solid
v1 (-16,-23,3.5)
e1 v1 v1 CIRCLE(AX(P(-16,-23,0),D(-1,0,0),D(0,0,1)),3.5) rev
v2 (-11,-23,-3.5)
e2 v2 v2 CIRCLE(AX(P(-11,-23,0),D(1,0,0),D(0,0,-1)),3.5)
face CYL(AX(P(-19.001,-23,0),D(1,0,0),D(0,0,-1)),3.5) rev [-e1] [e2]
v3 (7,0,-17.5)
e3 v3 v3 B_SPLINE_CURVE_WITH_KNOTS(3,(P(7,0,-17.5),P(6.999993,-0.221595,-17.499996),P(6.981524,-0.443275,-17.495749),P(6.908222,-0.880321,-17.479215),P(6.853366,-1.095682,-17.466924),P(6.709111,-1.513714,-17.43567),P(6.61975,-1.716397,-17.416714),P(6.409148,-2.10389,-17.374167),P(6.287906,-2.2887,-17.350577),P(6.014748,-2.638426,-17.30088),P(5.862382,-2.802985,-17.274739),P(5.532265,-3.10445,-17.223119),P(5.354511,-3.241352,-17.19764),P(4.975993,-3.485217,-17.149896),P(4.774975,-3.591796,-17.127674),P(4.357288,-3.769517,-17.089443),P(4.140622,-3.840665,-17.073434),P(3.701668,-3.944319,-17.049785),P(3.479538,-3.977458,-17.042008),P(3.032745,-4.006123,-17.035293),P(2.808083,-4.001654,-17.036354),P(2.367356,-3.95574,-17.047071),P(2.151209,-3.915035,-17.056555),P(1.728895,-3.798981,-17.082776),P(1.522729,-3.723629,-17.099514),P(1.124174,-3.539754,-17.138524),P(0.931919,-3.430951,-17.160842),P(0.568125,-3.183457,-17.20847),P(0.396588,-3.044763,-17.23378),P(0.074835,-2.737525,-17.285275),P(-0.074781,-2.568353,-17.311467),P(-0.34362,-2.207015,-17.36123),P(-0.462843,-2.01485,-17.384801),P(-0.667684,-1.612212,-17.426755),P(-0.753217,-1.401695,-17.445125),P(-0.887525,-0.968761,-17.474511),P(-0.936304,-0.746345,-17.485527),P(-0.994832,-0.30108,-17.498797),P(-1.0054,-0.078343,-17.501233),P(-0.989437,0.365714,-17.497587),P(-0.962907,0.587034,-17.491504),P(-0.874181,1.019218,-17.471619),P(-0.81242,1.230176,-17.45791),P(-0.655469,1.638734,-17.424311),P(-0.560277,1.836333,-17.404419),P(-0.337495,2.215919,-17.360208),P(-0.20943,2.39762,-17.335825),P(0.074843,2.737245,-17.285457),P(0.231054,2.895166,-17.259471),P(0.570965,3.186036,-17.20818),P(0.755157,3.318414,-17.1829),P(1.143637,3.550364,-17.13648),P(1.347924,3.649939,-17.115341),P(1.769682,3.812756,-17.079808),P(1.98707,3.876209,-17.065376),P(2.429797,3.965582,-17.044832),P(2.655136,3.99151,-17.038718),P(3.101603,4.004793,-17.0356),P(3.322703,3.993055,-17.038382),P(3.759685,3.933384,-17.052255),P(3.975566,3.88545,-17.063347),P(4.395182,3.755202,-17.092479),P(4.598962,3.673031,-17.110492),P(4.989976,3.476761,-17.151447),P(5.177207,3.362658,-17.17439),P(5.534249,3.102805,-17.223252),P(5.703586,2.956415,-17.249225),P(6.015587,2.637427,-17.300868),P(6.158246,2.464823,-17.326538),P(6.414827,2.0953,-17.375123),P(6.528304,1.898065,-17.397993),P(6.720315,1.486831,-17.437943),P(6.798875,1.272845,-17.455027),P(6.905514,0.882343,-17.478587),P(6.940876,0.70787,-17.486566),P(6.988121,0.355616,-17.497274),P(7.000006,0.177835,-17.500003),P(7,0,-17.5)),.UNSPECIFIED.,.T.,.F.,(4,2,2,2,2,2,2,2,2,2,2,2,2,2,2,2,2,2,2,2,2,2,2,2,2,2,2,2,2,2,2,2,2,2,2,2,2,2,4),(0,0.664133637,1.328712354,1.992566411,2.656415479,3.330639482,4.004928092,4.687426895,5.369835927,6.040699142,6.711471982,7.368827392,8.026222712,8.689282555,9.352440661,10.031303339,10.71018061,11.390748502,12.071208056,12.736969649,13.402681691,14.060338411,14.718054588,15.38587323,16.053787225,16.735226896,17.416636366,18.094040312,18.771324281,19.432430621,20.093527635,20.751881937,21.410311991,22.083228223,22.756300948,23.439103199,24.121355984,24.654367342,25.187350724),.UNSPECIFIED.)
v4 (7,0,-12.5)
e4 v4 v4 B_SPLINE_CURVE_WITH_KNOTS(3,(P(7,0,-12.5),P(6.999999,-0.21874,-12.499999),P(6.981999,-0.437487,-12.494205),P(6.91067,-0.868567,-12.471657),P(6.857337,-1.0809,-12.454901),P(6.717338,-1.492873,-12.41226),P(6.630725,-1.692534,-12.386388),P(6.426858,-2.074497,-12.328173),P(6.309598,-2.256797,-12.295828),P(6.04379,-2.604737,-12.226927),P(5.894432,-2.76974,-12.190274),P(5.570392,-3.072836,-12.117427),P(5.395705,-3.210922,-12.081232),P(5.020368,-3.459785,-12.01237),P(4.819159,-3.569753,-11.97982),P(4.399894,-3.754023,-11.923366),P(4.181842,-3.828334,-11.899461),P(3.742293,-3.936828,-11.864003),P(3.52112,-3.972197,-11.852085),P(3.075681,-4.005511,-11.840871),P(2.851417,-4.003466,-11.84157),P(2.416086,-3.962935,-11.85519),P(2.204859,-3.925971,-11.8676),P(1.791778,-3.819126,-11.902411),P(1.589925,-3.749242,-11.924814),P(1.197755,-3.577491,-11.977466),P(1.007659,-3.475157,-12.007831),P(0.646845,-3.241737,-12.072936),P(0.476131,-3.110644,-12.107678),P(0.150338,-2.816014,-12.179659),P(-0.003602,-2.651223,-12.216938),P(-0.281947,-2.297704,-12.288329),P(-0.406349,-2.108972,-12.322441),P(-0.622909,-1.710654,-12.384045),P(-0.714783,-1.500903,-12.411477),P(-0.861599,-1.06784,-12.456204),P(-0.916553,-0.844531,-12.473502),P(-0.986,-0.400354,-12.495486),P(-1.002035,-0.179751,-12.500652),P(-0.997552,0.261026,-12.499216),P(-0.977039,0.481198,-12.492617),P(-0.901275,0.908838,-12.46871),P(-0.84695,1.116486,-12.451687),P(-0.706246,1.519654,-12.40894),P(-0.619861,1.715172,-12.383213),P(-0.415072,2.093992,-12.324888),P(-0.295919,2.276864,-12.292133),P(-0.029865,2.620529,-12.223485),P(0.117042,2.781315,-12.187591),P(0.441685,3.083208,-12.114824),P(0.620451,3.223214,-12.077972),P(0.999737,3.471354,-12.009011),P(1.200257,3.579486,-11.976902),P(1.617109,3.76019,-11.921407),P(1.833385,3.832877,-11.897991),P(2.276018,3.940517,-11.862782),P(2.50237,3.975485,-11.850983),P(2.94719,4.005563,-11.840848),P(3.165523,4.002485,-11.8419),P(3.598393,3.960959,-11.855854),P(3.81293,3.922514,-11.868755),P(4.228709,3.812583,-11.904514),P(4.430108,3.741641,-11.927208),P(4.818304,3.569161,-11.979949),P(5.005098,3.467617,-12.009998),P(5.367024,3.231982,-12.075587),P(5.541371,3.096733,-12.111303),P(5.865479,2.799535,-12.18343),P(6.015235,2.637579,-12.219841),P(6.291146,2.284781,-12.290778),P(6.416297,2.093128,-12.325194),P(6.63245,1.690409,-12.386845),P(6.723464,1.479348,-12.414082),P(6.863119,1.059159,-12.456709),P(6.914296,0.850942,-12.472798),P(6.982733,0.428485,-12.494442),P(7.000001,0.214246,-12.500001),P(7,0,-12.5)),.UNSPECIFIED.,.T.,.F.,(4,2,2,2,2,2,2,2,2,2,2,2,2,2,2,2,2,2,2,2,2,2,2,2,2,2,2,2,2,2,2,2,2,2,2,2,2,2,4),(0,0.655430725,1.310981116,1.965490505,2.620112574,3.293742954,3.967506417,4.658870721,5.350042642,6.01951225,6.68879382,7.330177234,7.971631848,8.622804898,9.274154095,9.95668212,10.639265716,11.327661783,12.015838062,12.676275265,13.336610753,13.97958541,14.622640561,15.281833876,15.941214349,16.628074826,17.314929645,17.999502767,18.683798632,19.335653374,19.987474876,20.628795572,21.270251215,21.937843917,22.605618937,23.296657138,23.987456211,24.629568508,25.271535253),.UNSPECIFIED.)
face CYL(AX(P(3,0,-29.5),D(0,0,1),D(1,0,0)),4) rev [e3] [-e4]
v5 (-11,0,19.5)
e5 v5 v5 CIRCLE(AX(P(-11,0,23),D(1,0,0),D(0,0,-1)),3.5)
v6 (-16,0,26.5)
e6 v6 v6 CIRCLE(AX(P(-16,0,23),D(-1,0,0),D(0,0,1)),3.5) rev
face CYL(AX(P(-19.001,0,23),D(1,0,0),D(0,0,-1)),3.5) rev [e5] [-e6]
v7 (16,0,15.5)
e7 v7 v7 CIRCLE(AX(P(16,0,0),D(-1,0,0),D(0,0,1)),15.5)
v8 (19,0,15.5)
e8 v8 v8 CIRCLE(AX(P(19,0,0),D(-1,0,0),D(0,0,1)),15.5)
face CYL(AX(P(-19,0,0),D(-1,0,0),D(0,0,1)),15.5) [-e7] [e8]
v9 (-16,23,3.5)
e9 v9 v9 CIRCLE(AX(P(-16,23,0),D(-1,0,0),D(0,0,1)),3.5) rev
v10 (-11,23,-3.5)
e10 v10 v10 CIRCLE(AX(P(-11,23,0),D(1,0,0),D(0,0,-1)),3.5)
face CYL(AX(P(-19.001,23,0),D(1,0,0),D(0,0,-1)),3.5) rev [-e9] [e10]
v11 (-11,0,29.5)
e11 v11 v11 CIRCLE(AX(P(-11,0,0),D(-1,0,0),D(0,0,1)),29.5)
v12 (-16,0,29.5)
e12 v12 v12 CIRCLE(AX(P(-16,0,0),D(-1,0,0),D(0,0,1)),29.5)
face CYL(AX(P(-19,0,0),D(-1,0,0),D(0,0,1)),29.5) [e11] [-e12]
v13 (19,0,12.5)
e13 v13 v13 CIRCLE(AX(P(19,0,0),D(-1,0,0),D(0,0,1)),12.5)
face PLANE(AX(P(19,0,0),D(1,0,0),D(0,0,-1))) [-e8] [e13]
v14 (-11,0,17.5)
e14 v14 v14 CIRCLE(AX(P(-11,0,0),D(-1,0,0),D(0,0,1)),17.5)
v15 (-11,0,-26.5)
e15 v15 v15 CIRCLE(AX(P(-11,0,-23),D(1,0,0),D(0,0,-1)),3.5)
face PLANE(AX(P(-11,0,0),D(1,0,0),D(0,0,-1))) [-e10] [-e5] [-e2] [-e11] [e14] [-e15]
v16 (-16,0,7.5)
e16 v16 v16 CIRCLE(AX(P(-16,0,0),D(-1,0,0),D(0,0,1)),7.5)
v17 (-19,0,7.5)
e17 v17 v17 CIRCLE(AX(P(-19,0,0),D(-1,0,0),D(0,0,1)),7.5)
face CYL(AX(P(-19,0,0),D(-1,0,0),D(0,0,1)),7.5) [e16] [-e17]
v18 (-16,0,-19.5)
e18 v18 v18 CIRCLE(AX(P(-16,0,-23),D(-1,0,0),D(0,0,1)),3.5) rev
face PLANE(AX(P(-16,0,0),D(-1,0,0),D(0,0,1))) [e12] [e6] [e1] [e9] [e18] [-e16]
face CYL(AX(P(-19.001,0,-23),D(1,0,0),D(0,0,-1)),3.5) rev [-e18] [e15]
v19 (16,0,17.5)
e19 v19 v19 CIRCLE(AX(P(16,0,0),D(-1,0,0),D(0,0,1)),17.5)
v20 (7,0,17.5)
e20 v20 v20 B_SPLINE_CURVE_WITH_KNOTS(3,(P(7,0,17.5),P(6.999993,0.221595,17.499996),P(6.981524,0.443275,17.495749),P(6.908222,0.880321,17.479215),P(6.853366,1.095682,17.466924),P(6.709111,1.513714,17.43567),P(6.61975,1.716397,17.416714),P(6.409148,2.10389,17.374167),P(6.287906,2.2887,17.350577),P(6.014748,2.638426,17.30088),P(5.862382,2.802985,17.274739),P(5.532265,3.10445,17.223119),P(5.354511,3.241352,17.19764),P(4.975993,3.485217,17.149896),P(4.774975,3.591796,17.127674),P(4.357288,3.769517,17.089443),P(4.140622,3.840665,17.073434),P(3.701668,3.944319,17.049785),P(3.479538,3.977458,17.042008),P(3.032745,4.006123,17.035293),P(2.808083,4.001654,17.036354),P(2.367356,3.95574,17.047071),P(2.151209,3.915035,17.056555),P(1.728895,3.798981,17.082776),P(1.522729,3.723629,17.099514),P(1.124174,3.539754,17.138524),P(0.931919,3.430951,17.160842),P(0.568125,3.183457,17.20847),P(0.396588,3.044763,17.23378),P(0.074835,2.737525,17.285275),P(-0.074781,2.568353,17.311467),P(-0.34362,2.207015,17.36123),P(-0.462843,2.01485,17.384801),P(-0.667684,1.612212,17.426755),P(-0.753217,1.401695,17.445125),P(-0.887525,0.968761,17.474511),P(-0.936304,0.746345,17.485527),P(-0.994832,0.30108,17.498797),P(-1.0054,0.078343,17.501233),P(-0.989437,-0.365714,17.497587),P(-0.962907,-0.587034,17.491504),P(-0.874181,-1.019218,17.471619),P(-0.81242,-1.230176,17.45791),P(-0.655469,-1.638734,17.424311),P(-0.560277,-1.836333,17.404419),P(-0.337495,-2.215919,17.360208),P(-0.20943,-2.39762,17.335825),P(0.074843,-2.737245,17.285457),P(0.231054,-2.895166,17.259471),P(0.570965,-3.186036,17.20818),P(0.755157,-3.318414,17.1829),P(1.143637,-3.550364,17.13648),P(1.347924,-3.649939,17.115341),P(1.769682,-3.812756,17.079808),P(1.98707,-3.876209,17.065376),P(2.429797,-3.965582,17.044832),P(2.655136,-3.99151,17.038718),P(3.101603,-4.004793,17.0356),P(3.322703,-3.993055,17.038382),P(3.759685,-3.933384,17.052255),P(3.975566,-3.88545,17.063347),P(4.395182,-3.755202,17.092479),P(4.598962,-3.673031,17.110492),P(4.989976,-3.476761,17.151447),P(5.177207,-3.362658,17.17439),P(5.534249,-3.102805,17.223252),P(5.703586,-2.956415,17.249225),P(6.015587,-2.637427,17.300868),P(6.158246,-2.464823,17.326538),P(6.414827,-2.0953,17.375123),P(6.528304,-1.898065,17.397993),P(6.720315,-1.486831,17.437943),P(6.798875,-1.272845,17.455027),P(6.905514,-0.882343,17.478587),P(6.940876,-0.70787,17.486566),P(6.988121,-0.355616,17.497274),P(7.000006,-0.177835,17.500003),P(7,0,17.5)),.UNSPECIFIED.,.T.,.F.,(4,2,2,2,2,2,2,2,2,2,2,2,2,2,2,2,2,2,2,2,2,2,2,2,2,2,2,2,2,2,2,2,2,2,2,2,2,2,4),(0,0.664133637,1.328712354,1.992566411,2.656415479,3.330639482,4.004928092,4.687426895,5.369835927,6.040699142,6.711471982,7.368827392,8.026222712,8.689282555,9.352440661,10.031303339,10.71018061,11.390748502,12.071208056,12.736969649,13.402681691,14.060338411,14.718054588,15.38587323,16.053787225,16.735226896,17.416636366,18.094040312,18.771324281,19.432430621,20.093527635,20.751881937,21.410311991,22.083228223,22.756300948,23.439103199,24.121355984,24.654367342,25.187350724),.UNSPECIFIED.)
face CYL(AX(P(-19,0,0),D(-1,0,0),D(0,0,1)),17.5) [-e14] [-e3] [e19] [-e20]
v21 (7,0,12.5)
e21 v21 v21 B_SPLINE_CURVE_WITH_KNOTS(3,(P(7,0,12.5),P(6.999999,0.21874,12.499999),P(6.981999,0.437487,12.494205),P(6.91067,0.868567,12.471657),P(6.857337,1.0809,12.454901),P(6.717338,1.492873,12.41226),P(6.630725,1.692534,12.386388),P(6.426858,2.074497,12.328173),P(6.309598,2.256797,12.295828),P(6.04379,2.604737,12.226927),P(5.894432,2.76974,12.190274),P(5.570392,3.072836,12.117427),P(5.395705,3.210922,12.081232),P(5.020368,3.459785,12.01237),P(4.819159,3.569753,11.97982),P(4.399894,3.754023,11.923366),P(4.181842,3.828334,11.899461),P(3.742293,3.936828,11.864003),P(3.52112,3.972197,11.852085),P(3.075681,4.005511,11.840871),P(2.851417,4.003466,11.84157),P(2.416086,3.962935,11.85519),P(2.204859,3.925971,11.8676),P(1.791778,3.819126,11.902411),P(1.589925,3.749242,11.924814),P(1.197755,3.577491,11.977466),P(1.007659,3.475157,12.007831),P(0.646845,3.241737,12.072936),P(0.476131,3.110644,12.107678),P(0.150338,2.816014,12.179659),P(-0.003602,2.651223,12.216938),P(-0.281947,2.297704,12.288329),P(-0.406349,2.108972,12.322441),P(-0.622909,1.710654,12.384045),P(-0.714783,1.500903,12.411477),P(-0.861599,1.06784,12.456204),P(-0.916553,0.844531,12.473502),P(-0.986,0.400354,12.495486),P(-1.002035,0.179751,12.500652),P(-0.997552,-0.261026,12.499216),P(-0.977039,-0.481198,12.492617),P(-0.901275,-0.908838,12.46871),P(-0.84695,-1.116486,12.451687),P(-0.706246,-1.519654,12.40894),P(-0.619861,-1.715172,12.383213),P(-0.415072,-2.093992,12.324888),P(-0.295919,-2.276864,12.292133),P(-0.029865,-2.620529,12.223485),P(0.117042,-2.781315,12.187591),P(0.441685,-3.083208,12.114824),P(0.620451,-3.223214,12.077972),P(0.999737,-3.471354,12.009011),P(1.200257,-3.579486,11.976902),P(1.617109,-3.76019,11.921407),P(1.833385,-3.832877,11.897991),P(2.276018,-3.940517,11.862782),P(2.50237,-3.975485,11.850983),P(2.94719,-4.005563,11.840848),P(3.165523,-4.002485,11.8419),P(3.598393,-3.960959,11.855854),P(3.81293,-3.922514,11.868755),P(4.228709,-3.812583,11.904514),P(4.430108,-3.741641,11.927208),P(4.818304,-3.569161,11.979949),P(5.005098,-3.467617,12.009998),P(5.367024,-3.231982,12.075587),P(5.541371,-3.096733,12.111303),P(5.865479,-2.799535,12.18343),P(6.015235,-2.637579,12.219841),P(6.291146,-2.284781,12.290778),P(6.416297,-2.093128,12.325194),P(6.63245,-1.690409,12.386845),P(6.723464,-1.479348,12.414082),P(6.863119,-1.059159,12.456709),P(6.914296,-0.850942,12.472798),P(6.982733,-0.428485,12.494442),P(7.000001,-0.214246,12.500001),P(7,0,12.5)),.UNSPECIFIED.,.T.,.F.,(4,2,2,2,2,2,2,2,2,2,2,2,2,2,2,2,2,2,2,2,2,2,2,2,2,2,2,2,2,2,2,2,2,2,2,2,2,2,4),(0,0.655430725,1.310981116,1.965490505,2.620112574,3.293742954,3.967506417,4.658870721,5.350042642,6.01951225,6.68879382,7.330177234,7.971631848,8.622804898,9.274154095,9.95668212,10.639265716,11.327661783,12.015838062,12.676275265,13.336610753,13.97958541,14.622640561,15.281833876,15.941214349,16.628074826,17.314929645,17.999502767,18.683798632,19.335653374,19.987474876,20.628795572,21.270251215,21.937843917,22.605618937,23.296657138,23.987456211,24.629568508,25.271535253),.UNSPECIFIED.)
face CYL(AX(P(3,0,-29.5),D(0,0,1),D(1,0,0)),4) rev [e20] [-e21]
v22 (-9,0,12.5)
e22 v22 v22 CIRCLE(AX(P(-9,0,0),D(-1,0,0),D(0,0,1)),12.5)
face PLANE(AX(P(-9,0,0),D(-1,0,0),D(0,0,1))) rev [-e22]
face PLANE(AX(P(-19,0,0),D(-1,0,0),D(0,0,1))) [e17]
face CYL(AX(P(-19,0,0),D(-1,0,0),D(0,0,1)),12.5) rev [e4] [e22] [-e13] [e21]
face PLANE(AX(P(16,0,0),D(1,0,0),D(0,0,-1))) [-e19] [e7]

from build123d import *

# Parameters (mm, degrees)
CUT_EXTRUDE1_REACH      = 53.386
SKETCH2_R               = 3.5
CUT_EXTRUDE2_DEPTH      = 46.84212037
CUT_EXTRUDE2_DEPTH_BACK = 46.84212037
SKETCH3_R               = 4


# Read off the part's stored shape, not the designer's step: Revolve1
with BuildPart() as part:
    # Revolve1 outline → Revolve1 (revolve)
    with BuildSketch(Plane.YX):
        Polygon((0, -9), (0, -19), (7.5, -19), (7.5, -16), (29.5, -16), (29.5, -11), (17.5, -11), (17.5, 16), (15.5, 16), (15.5, 19), (12.5, 19), (12.5, -9), align=None)
    revolve(axis=Axis((0, 0, 0), (1, 0, 0)))

    # Sketch2 → Cut-Extrude1 (cut, up to next)
    with BuildSketch(Plane(origin=(-11, 0, 0), x_dir=(0, 0, -1), z_dir=(1, 0, 0)), mode=Mode.PRIVATE) as cut_extrude1_sk1:
        with Locations((0, 23)):
            Circle(SKETCH2_R)
    cut_extrude1_tool1 = extrude(cut_extrude1_sk1.sketch, amount=-CUT_EXTRUDE1_REACH, mode=Mode.PRIVATE) & part.part
    # Sketch2 → Cut-Extrude1 (cut, up to next)
    with BuildSketch(Plane(origin=(-11, 0, 0), x_dir=(0, 0, -1), z_dir=(1, 0, 0)), mode=Mode.PRIVATE) as cut_extrude1_sk2:
        with Locations((23, 0)):
            Circle(SKETCH2_R)
    cut_extrude1_tool2 = extrude(cut_extrude1_sk2.sketch, amount=-CUT_EXTRUDE1_REACH, mode=Mode.PRIVATE) & part.part
    # Sketch2 → Cut-Extrude1 (cut, up to next)
    with BuildSketch(Plane(origin=(-11, 0, 0), x_dir=(0, 0, -1), z_dir=(1, 0, 0)), mode=Mode.PRIVATE) as cut_extrude1_sk3:
        with Locations((0, -23)):
            Circle(SKETCH2_R)
    cut_extrude1_tool3 = extrude(cut_extrude1_sk3.sketch, amount=-CUT_EXTRUDE1_REACH, mode=Mode.PRIVATE) & part.part
    # Sketch2 → Cut-Extrude1 (cut, up to next)
    with BuildSketch(Plane(origin=(-11, 0, 0), x_dir=(0, 0, -1), z_dir=(1, 0, 0)), mode=Mode.PRIVATE) as cut_extrude1_sk4:
        with Locations((-23, 0)):
            Circle(SKETCH2_R)
    cut_extrude1_tool4 = extrude(cut_extrude1_sk4.sketch, amount=-CUT_EXTRUDE1_REACH, mode=Mode.PRIVATE) & part.part
    add(cut_extrude1_tool1.solids().sort_by_distance((-11, 23, 0))[0], mode=Mode.SUBTRACT)
    add(cut_extrude1_tool2.solids().sort_by_distance((-11, 0, -23))[0], mode=Mode.SUBTRACT)
    add(cut_extrude1_tool3.solids().sort_by_distance((-11, -23, 0))[0], mode=Mode.SUBTRACT)
    add(cut_extrude1_tool4.solids().sort_by_distance((-11, 0, 23))[0], mode=Mode.SUBTRACT)

    # Sketch3 → Cut-Extrude2 (cut, two sides: drawn at the far end of the back side and taken through both)
    with BuildSketch(Plane.XY.offset(-CUT_EXTRUDE2_DEPTH_BACK)):
        with Locations((3, 0)):
            Circle(SKETCH3_R)
    extrude(amount=CUT_EXTRUDE2_DEPTH + CUT_EXTRUDE2_DEPTH_BACK, mode=Mode.SUBTRACT)


solid = part.part
